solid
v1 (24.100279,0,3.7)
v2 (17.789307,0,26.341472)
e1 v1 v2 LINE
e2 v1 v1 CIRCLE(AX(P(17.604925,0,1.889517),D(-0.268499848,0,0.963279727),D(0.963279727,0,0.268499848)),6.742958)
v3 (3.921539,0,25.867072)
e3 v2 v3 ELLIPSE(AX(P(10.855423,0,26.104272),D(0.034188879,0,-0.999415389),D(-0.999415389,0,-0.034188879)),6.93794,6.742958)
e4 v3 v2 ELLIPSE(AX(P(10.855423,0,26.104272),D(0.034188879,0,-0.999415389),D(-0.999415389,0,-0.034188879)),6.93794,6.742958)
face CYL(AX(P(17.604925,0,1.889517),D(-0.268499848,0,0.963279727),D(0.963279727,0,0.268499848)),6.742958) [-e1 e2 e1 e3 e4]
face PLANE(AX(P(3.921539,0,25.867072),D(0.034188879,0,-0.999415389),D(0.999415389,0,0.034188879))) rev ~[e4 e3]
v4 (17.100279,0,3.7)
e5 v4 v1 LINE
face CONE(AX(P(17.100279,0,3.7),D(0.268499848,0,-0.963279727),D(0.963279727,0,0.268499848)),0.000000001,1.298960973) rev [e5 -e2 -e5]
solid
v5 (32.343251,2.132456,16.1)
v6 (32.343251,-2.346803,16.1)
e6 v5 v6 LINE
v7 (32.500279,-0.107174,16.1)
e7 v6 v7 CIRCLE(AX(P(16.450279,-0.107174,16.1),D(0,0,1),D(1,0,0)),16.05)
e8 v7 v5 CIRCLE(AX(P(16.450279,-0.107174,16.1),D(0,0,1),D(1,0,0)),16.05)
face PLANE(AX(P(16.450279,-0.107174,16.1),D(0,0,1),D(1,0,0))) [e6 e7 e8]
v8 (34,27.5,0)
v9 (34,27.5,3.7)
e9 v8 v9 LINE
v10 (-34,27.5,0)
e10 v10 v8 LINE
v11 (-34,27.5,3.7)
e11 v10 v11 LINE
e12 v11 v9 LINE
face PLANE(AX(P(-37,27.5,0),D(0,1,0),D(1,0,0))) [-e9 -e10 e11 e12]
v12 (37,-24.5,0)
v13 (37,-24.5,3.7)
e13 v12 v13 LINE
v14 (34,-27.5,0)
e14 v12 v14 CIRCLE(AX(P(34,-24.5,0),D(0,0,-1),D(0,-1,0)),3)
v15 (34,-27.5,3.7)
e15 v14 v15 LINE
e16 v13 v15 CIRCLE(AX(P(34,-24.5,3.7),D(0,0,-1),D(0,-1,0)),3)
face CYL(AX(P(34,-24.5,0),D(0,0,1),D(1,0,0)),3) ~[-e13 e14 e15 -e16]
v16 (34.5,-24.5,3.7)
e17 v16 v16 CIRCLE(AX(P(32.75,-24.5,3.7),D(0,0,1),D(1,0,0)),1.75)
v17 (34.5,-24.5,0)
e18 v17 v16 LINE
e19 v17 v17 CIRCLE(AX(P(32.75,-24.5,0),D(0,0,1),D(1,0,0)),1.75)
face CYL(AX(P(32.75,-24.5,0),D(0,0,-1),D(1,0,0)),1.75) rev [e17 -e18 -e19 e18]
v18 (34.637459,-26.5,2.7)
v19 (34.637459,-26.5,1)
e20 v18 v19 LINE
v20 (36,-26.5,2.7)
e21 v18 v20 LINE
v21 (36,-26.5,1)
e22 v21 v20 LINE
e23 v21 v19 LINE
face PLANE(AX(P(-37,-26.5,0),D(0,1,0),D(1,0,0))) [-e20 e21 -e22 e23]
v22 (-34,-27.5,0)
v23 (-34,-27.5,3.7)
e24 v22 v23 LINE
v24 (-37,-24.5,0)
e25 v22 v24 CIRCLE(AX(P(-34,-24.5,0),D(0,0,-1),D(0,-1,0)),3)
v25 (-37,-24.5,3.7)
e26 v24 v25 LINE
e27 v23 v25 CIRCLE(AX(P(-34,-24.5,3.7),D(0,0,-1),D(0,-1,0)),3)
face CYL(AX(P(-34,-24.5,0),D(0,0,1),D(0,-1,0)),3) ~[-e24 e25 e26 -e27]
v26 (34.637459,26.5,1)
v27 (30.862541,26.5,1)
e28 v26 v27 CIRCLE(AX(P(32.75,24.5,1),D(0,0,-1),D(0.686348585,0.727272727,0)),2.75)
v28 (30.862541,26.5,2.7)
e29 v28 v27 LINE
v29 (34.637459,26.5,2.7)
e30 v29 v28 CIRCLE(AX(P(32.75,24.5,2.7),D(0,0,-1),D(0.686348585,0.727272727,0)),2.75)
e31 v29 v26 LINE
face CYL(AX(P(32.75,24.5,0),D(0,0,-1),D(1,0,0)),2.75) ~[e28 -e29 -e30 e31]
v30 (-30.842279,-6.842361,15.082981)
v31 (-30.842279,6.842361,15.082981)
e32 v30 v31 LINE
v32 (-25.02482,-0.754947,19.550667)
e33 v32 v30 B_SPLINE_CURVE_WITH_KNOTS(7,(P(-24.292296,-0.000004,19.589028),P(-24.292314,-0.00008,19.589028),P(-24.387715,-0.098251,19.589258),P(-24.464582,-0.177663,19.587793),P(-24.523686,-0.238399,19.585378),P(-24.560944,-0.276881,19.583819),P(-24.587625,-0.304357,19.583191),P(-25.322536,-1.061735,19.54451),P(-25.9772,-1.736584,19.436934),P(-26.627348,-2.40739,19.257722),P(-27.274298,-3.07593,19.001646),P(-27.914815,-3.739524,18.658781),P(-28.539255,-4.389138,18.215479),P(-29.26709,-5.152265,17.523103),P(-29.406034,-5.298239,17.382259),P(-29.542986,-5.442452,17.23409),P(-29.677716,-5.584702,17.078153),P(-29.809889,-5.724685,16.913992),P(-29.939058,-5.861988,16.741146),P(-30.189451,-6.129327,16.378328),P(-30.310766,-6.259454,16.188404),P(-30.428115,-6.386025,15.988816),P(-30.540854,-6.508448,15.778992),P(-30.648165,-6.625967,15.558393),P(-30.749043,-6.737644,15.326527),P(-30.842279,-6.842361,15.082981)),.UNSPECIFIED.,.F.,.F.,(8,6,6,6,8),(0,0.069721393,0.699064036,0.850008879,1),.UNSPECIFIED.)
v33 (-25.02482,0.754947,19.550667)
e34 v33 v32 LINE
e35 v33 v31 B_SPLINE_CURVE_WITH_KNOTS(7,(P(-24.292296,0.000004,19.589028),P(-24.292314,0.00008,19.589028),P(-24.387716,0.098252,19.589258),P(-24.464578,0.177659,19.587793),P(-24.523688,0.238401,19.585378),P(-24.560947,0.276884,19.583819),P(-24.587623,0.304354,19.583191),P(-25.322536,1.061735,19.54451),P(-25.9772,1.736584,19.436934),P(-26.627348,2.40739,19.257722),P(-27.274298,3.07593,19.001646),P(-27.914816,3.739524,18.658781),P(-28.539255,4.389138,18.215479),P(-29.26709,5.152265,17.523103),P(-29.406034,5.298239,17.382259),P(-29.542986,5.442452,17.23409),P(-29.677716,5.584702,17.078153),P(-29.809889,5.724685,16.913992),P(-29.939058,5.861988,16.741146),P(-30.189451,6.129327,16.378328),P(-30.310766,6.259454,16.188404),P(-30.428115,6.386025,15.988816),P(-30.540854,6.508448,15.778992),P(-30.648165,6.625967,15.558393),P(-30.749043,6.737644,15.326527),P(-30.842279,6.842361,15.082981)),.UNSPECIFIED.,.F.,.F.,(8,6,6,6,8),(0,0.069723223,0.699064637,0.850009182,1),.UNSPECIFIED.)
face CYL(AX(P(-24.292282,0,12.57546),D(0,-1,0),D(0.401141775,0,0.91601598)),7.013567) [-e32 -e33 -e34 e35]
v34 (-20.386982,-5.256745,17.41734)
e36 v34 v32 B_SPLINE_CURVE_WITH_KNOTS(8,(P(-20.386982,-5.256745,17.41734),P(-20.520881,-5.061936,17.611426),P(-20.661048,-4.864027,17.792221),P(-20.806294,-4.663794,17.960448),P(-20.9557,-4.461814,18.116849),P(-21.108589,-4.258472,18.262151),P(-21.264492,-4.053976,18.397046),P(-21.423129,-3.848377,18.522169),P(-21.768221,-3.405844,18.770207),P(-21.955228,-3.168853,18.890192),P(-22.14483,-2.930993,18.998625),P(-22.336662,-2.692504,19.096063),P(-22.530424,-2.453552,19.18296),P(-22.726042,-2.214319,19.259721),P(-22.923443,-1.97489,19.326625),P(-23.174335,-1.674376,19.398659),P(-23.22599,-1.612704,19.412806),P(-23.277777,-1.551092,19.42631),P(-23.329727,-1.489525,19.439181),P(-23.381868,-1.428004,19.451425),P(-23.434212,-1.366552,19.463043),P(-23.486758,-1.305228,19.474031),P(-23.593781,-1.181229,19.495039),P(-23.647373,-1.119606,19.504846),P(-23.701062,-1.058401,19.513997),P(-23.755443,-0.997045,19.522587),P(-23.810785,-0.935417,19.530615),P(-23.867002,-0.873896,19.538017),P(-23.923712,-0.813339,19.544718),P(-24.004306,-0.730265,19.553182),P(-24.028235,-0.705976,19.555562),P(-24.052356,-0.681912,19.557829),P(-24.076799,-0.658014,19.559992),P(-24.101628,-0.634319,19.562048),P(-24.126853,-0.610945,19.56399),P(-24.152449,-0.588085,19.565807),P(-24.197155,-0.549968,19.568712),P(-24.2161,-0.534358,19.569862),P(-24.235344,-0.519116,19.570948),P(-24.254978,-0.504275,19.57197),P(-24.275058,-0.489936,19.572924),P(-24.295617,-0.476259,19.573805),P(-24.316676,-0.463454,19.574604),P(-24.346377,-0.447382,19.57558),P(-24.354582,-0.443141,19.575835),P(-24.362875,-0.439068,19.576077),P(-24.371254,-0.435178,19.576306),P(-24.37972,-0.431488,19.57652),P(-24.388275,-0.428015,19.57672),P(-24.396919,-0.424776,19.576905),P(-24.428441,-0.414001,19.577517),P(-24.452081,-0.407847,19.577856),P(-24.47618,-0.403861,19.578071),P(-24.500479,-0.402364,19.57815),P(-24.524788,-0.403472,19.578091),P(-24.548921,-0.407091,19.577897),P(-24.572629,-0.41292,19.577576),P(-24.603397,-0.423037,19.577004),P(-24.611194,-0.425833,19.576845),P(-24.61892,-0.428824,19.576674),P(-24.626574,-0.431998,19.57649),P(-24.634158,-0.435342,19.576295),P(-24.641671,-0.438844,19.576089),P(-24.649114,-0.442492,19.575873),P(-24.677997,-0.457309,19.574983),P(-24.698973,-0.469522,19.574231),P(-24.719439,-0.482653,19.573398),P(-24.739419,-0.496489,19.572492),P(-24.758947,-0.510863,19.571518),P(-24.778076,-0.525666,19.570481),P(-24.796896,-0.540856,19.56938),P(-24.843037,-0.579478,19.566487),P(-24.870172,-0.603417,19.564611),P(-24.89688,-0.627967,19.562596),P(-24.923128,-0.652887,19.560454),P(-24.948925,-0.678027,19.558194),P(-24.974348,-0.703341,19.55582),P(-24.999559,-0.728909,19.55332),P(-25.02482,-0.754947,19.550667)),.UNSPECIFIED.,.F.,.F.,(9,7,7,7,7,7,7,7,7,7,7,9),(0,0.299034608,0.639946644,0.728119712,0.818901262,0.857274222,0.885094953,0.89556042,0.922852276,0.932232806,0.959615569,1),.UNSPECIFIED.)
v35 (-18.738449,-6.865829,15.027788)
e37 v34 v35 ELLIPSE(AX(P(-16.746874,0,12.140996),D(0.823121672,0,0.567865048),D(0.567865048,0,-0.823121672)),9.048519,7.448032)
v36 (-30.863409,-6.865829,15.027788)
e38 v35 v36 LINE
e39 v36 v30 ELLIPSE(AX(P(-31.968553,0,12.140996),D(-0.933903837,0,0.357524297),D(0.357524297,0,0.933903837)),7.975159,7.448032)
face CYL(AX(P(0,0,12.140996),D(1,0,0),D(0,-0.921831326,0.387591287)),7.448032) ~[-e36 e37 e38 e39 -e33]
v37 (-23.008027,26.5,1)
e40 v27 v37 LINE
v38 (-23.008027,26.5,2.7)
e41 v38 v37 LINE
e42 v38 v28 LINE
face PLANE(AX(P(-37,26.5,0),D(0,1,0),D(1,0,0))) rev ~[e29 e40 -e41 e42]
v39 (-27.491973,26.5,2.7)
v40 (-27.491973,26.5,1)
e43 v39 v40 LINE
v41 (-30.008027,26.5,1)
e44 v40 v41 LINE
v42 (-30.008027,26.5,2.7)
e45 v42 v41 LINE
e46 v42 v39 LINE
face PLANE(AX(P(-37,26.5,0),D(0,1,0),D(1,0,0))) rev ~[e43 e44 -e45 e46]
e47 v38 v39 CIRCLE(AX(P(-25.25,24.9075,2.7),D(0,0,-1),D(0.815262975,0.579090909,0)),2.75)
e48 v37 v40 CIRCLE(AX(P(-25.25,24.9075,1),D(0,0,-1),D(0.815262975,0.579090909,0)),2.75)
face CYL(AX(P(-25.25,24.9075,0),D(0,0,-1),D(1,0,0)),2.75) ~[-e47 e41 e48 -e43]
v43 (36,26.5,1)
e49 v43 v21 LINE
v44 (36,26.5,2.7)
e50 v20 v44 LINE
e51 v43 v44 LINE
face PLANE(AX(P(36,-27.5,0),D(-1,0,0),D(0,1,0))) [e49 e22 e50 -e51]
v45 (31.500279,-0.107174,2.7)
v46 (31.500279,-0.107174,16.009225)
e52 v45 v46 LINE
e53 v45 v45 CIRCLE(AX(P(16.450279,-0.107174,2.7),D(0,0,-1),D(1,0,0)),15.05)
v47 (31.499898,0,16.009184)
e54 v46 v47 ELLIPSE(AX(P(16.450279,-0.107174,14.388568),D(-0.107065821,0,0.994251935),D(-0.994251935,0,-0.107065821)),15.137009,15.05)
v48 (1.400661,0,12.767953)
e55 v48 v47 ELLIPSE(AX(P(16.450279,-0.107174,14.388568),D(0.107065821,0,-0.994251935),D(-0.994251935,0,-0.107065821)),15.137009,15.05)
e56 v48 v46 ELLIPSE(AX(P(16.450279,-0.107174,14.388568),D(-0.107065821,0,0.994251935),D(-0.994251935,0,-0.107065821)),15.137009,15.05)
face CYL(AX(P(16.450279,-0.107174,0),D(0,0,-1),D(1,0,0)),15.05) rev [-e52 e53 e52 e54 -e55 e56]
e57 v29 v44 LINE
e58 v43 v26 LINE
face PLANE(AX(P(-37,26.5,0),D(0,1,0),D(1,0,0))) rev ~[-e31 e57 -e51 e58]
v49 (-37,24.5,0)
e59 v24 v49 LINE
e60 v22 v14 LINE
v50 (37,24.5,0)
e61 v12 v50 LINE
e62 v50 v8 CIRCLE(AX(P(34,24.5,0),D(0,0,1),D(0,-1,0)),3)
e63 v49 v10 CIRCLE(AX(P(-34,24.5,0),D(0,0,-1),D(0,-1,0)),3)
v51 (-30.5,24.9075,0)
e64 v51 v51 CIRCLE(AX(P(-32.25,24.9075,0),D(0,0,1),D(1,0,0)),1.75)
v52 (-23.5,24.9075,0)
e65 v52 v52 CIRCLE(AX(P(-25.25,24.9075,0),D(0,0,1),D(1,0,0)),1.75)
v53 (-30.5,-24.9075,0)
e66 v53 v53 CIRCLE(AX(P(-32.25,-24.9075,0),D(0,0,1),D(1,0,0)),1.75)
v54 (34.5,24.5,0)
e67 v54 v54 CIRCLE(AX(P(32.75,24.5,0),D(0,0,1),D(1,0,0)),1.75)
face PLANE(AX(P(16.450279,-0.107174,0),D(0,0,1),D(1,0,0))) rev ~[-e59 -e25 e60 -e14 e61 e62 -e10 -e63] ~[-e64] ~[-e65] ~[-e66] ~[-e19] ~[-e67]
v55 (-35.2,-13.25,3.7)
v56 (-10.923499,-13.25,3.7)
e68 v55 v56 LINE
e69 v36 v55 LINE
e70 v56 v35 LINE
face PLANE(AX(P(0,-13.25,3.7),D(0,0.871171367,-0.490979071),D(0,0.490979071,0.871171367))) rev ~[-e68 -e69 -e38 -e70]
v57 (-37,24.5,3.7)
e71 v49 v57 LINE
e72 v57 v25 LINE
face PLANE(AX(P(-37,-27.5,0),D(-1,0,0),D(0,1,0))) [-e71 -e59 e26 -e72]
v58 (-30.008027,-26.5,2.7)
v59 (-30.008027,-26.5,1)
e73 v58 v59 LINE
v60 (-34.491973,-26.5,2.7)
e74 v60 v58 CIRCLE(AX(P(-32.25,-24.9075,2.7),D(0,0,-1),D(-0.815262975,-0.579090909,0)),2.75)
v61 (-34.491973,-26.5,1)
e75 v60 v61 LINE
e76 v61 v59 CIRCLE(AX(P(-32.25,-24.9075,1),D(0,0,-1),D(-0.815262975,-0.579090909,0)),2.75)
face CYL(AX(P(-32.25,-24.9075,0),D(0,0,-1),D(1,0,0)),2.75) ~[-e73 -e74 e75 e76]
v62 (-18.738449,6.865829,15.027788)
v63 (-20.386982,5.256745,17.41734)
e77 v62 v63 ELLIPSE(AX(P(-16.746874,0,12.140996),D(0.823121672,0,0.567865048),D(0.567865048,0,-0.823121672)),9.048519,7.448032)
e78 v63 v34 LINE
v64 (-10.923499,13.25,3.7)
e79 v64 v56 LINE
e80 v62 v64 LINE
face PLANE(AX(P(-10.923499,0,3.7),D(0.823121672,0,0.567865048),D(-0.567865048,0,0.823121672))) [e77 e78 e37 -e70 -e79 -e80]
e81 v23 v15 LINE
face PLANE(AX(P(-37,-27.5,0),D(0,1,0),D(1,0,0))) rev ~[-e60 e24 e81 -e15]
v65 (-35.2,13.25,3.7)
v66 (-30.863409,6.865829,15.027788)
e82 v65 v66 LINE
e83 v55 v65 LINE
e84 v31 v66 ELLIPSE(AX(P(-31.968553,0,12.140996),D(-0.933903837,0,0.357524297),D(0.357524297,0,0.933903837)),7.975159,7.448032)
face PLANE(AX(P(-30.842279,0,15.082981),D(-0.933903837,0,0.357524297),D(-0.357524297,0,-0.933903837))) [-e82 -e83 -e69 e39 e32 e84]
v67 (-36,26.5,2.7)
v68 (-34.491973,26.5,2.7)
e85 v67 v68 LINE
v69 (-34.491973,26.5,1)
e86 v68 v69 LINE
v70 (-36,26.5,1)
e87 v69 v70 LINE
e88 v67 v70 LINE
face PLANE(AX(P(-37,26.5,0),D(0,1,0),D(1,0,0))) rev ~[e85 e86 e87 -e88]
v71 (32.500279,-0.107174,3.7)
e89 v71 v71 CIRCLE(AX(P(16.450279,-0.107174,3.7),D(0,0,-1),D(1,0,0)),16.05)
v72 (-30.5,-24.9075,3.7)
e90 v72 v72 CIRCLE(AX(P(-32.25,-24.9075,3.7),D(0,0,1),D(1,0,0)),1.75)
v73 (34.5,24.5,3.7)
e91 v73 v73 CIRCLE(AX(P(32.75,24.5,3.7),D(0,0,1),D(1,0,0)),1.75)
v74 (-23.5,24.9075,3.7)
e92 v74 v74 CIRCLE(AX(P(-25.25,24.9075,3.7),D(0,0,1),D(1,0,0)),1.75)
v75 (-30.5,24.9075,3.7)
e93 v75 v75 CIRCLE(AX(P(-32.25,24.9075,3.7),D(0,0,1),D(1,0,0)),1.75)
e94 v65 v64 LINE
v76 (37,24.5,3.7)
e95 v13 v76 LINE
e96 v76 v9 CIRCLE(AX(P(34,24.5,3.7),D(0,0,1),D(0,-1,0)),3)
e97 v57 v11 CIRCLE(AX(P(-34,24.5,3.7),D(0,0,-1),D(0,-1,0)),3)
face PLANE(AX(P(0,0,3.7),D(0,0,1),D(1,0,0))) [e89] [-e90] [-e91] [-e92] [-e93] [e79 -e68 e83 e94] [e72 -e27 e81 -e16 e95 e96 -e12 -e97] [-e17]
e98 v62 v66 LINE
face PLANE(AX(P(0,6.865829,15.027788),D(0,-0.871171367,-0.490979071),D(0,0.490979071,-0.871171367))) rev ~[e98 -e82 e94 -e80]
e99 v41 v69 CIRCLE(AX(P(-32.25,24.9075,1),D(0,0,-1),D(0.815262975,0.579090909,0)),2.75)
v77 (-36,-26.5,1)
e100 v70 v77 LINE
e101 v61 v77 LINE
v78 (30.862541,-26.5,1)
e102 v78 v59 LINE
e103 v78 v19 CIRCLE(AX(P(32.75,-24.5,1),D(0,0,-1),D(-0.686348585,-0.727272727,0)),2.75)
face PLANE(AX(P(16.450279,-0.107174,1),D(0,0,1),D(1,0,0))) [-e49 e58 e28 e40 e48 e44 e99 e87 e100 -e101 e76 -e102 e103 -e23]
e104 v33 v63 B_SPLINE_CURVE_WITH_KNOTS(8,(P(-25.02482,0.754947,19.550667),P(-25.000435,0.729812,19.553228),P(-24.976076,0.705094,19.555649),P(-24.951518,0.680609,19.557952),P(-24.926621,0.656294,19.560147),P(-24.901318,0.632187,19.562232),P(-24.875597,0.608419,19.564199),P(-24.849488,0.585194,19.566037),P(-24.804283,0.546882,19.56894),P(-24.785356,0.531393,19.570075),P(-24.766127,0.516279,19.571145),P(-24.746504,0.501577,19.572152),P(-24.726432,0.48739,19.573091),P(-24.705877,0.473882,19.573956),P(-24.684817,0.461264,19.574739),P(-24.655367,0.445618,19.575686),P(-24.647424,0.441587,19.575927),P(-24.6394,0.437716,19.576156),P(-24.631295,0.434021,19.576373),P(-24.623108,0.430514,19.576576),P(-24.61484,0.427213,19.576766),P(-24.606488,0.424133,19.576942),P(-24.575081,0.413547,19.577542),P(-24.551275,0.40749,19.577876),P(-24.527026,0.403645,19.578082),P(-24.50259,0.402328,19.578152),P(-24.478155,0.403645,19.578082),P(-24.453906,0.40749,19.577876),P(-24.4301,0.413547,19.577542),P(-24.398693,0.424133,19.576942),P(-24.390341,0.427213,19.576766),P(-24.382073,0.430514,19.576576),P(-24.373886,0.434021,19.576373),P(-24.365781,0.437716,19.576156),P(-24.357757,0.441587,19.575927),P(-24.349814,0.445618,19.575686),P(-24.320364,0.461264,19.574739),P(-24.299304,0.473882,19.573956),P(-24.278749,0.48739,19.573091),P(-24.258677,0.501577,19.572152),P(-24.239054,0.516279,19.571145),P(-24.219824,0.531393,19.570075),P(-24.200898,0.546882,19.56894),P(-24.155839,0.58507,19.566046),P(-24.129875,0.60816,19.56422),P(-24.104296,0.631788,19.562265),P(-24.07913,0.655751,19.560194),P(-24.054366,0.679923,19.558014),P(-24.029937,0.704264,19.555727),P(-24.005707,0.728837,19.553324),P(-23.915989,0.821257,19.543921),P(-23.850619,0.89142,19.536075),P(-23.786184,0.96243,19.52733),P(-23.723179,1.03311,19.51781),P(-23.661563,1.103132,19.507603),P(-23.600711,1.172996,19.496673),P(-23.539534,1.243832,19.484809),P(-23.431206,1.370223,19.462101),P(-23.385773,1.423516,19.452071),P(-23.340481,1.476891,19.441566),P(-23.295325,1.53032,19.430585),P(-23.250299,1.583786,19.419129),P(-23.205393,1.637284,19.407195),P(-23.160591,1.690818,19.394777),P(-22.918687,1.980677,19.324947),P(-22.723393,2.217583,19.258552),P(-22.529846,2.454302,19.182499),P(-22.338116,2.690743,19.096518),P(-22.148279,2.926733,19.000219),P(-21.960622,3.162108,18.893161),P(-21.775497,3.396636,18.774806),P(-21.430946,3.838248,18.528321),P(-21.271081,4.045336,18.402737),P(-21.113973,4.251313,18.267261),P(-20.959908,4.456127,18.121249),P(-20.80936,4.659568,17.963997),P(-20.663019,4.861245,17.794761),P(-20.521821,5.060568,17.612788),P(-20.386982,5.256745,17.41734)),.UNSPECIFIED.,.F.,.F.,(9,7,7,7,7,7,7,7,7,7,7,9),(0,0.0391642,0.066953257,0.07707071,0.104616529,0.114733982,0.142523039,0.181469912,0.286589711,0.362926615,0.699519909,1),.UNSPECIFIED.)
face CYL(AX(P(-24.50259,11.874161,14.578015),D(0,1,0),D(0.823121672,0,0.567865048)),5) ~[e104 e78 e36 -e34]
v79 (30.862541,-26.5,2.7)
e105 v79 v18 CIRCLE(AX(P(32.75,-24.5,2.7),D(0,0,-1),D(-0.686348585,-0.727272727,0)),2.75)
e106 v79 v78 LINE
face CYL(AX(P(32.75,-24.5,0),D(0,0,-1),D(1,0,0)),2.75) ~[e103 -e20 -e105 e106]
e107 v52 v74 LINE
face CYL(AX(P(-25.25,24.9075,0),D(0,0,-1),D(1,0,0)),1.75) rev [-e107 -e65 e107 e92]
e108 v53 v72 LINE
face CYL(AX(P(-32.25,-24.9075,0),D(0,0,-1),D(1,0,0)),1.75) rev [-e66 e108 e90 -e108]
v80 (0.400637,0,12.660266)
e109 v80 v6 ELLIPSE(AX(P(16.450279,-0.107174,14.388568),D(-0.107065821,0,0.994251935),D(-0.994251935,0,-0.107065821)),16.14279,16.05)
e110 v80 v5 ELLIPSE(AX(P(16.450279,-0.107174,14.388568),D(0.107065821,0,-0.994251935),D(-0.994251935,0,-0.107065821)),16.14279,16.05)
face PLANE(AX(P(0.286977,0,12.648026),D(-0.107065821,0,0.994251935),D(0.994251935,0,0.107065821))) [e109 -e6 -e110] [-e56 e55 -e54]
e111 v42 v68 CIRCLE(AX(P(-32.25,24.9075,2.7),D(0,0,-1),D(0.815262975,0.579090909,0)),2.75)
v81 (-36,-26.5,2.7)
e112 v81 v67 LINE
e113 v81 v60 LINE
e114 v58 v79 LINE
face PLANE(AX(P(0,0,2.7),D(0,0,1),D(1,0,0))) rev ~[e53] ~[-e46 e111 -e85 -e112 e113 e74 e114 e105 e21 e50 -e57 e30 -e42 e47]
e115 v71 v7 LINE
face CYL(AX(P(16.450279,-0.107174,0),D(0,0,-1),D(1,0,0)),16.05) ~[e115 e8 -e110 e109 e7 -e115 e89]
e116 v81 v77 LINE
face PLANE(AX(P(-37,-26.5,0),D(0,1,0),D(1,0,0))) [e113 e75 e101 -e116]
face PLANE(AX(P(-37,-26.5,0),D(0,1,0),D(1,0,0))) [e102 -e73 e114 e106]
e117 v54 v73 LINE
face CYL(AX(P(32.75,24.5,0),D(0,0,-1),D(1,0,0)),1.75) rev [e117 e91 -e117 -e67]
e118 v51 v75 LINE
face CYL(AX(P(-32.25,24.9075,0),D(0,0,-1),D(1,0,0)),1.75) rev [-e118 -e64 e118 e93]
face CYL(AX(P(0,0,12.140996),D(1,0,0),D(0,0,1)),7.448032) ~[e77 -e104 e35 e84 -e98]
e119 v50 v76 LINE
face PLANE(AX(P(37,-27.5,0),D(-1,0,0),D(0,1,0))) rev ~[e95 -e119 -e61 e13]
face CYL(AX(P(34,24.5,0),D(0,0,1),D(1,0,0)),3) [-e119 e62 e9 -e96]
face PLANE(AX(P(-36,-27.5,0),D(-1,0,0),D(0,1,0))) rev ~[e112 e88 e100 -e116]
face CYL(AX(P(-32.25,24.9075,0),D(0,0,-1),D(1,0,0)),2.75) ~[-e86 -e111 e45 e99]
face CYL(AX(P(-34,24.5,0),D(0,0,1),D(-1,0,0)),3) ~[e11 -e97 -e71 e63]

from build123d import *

# Parameters (mm, degrees)
F0_W          = 74
F0_H          = 55
F0_R          = 1.75
F0_R_2        = 16.05
F0_W_2        = 30
F0_H_2        = 26
F1_DEPTH      = 3.7
F2_DEPTH      = 16.1
F3_T          = -1
F4_R          = 3
F5_R          = 3
F6_R          = 3
F8_DEPTH      = 25
F8_DEPTH_BACK = 25
F10_DEPTH     = 13.25
F12_DEPTH     = 45
F13_T1_DEPTH  = 23.7483217569
F14_R         = 1.75
F15_DEPTH     = 104
F19_DEPTH     = 12.5


# Not quite as in the source:
# - a fillet or chamfer that OpenCascade refuses, or shapes differently, is made with other operations: its cross-section is extruded or revolved along the edge and cut away or added
# - an extrude ends at something that could not be found from the text; its depth is read off the source's solid


with BuildPart() as f1:
    # F0 (on Top) → F1 (new body)
    with BuildSketch(Plane.XY):
        Rectangle(F0_W, F0_H)
        with Locations((-32.25, -24.9075)):
            Circle(F0_R, mode=Mode.SUBTRACT)
        with Locations((32.75, -24.5)):
            Circle(F0_R, mode=Mode.SUBTRACT)
        with Locations((16.4502794727, -0.1071739239)):
            Circle(F0_R_2, mode=Mode.SUBTRACT)
        with Locations((-20.85, 0)):
            Rectangle(F0_W_2, F0_H_2, mode=Mode.SUBTRACT)
        with Locations((-32.25, 24.9075)):
            Circle(F0_R, mode=Mode.SUBTRACT)
        with Locations((-25.25, 24.9075)):
            Circle(F0_R, mode=Mode.SUBTRACT)
        with Locations((32.75, 24.5)):
            Circle(F0_R, mode=Mode.SUBTRACT)
        with Locations((16.4502794727, -0.1071739239)):
            Circle(F0_R_2)
        with Locations((-20.85, 0)):
            Rectangle(F0_W_2, F0_H_2)
    extrude(amount=F1_DEPTH)

    # F0 (on Top) → F2 (join)
    with BuildSketch(Plane.XY):
        with Locations((16.4502794727, -0.1071739239)):
            Circle(F0_R_2)
    extrude(amount=F2_DEPTH)

    # F3
    f3_openings = [f1.faces().sort_by_distance(p)[0] for p in [
        (16.450279, -0.107174, 16.1),
    ]]
    offset(amount=F3_T, openings=f3_openings, kind=Kind.INTERSECTION)

    # F4
    f4_edges = [f1.edges().sort_by_distance(p)[0] for p in [
        (37, -27.5, 1.85),
    ]]
    fillet(f4_edges, radius=F4_R)

    # F5
    f5_edges = [f1.edges().sort_by_distance(p)[0] for p in [
        (-37, -27.5, 1.85),
    ]]
    fillet(f5_edges, radius=F5_R)

    # F6
    f6_edges = [f1.edges().sort_by_distance(p)[0] for p in [
        (37, 27.5, 1.85),
        (-37, 27.5, 1.85),
    ]]
    fillet(f6_edges, radius=F6_R)

    # F7 (on Front) → F8 (cut, two sides)
    with BuildSketch(Plane.XZ) as f8_sk:
        Polygon((0.28697688, 12.6480264865), (32.789242817, 16.1480264865), (0.28697688, 16.1480264865), align=None)
    extrude(amount=-F8_DEPTH, mode=Mode.SUBTRACT)
    extrude(f8_sk.sketch, amount=F8_DEPTH_BACK, mode=Mode.SUBTRACT)

    # F9 (on Front) → F10 (join, symmetric)
    with BuildSketch(Plane.XZ):
        with BuildLine():
            Line((-35.2, 3.7), (-34, 3.7))
            Line((-34, 3.7), (-10.9234992415, 3.7))
            Line((-10.9234992415, 3.7), (-21.4788466692, 19))
            ThreePointArc((-21.4788466692, 19), (-26.9989833996, 19.0456914763), (-30.8422791347, 15.082980898))
            Line((-30.8422791347, 15.082980898), (-35.2, 3.7))
        make_face()
    extrude(amount=F10_DEPTH, both=True)

    # F11 (on Right) → F12 (cut)
    with BuildSketch(Plane.YZ):
        with BuildLine():
            ThreePointArc((-6.8658292344, 15.0277878828), (-4.1214232588, 18.344788865), (0, 19.5890275867))
            Line((0, 19.5890275867), (-13.25, 19.5890275867))
            Line((-13.25, 19.5890275867), (-13.25, 15.082980898))
            Line((-13.25, 15.082980898), (-13.25, 3.7))
            Line((-13.25, 3.7), (-6.8658292344, 15.0277878828))
        make_face()
        with BuildLine():
            Line((13.25, 3.7), (13.25, 15.082980898))
            Line((13.25, 15.082980898), (13.25, 19.5890275867))
            Line((13.25, 19.5890275867), (0, 19.5890275867))
            ThreePointArc((0, 19.5890275867), (4.1214232588, 18.344788865), (6.8658292344, 15.0277878828))
            Line((6.8658292344, 15.0277878828), (13.25, 3.7))
        make_face()
    extrude(amount=-F12_DEPTH, mode=Mode.SUBTRACT)

    # F13: fillet of radius 5 on 1 edges, made by hand

    # F13_s2 → F13_t1 (cut)
    with BuildSketch(Plane.XZ.offset(-11.8741608785)):
        with BuildLine():
            ThreePointArc((-20.3869820489, 17.4173397602), (-22.4131252415, 19.1204957059), (-25.0248198534, 19.5506673765))
            ThreePointArc((-25.0248198534, 19.5506673765), (-23.2160189055, 19.5059570206), (-21.4788466692, 19))
            Line((-21.4788466692, 19), (-20.3869820489, 17.4173397602))
        make_face()
    extrude(amount=F13_T1_DEPTH, mode=Mode.SUBTRACT)

    # F14 (on Top) → F15 (cut, through all)
    with BuildSketch(Plane.XY):
        with Locations((-32.25, 24.9075)):
            Circle(F14_R)
        with Locations((-25.25, 24.9075)):
            Circle(F14_R)
    extrude(amount=-F15_DEPTH, mode=Mode.SUBTRACT)


with BuildPart() as f17:
    # F16 (on Front) → F17 (revolve)
    with BuildSketch(Plane.XZ):
        Polygon((9.7785348499, 29.9677548091), (17.1002794727, 3.7), (24.1002794727, 3.7), (16.7785348499, 29.9677548091), align=None)
    revolve(axis=Axis((13.4394071613, 0, 16.8338774046), (-0.2684998475, 0, 0.9632797267)))

    # F18 (on Front) → F19 (cut, symmetric)
    with BuildSketch(Plane.XZ):
        Polygon((0.2809657395, 25.7425316266), (3.921539106, 25.8670715578), (17.7893069679, 26.3414723408), (18.2282145804, 32.3491258427), (4.9899508543, 32.7628237839), (2.055067569, 32.8836254776), align=None)
    extrude(amount=F19_DEPTH, both=True, mode=Mode.SUBTRACT)


solid = Compound([f1.part, f17.part])
